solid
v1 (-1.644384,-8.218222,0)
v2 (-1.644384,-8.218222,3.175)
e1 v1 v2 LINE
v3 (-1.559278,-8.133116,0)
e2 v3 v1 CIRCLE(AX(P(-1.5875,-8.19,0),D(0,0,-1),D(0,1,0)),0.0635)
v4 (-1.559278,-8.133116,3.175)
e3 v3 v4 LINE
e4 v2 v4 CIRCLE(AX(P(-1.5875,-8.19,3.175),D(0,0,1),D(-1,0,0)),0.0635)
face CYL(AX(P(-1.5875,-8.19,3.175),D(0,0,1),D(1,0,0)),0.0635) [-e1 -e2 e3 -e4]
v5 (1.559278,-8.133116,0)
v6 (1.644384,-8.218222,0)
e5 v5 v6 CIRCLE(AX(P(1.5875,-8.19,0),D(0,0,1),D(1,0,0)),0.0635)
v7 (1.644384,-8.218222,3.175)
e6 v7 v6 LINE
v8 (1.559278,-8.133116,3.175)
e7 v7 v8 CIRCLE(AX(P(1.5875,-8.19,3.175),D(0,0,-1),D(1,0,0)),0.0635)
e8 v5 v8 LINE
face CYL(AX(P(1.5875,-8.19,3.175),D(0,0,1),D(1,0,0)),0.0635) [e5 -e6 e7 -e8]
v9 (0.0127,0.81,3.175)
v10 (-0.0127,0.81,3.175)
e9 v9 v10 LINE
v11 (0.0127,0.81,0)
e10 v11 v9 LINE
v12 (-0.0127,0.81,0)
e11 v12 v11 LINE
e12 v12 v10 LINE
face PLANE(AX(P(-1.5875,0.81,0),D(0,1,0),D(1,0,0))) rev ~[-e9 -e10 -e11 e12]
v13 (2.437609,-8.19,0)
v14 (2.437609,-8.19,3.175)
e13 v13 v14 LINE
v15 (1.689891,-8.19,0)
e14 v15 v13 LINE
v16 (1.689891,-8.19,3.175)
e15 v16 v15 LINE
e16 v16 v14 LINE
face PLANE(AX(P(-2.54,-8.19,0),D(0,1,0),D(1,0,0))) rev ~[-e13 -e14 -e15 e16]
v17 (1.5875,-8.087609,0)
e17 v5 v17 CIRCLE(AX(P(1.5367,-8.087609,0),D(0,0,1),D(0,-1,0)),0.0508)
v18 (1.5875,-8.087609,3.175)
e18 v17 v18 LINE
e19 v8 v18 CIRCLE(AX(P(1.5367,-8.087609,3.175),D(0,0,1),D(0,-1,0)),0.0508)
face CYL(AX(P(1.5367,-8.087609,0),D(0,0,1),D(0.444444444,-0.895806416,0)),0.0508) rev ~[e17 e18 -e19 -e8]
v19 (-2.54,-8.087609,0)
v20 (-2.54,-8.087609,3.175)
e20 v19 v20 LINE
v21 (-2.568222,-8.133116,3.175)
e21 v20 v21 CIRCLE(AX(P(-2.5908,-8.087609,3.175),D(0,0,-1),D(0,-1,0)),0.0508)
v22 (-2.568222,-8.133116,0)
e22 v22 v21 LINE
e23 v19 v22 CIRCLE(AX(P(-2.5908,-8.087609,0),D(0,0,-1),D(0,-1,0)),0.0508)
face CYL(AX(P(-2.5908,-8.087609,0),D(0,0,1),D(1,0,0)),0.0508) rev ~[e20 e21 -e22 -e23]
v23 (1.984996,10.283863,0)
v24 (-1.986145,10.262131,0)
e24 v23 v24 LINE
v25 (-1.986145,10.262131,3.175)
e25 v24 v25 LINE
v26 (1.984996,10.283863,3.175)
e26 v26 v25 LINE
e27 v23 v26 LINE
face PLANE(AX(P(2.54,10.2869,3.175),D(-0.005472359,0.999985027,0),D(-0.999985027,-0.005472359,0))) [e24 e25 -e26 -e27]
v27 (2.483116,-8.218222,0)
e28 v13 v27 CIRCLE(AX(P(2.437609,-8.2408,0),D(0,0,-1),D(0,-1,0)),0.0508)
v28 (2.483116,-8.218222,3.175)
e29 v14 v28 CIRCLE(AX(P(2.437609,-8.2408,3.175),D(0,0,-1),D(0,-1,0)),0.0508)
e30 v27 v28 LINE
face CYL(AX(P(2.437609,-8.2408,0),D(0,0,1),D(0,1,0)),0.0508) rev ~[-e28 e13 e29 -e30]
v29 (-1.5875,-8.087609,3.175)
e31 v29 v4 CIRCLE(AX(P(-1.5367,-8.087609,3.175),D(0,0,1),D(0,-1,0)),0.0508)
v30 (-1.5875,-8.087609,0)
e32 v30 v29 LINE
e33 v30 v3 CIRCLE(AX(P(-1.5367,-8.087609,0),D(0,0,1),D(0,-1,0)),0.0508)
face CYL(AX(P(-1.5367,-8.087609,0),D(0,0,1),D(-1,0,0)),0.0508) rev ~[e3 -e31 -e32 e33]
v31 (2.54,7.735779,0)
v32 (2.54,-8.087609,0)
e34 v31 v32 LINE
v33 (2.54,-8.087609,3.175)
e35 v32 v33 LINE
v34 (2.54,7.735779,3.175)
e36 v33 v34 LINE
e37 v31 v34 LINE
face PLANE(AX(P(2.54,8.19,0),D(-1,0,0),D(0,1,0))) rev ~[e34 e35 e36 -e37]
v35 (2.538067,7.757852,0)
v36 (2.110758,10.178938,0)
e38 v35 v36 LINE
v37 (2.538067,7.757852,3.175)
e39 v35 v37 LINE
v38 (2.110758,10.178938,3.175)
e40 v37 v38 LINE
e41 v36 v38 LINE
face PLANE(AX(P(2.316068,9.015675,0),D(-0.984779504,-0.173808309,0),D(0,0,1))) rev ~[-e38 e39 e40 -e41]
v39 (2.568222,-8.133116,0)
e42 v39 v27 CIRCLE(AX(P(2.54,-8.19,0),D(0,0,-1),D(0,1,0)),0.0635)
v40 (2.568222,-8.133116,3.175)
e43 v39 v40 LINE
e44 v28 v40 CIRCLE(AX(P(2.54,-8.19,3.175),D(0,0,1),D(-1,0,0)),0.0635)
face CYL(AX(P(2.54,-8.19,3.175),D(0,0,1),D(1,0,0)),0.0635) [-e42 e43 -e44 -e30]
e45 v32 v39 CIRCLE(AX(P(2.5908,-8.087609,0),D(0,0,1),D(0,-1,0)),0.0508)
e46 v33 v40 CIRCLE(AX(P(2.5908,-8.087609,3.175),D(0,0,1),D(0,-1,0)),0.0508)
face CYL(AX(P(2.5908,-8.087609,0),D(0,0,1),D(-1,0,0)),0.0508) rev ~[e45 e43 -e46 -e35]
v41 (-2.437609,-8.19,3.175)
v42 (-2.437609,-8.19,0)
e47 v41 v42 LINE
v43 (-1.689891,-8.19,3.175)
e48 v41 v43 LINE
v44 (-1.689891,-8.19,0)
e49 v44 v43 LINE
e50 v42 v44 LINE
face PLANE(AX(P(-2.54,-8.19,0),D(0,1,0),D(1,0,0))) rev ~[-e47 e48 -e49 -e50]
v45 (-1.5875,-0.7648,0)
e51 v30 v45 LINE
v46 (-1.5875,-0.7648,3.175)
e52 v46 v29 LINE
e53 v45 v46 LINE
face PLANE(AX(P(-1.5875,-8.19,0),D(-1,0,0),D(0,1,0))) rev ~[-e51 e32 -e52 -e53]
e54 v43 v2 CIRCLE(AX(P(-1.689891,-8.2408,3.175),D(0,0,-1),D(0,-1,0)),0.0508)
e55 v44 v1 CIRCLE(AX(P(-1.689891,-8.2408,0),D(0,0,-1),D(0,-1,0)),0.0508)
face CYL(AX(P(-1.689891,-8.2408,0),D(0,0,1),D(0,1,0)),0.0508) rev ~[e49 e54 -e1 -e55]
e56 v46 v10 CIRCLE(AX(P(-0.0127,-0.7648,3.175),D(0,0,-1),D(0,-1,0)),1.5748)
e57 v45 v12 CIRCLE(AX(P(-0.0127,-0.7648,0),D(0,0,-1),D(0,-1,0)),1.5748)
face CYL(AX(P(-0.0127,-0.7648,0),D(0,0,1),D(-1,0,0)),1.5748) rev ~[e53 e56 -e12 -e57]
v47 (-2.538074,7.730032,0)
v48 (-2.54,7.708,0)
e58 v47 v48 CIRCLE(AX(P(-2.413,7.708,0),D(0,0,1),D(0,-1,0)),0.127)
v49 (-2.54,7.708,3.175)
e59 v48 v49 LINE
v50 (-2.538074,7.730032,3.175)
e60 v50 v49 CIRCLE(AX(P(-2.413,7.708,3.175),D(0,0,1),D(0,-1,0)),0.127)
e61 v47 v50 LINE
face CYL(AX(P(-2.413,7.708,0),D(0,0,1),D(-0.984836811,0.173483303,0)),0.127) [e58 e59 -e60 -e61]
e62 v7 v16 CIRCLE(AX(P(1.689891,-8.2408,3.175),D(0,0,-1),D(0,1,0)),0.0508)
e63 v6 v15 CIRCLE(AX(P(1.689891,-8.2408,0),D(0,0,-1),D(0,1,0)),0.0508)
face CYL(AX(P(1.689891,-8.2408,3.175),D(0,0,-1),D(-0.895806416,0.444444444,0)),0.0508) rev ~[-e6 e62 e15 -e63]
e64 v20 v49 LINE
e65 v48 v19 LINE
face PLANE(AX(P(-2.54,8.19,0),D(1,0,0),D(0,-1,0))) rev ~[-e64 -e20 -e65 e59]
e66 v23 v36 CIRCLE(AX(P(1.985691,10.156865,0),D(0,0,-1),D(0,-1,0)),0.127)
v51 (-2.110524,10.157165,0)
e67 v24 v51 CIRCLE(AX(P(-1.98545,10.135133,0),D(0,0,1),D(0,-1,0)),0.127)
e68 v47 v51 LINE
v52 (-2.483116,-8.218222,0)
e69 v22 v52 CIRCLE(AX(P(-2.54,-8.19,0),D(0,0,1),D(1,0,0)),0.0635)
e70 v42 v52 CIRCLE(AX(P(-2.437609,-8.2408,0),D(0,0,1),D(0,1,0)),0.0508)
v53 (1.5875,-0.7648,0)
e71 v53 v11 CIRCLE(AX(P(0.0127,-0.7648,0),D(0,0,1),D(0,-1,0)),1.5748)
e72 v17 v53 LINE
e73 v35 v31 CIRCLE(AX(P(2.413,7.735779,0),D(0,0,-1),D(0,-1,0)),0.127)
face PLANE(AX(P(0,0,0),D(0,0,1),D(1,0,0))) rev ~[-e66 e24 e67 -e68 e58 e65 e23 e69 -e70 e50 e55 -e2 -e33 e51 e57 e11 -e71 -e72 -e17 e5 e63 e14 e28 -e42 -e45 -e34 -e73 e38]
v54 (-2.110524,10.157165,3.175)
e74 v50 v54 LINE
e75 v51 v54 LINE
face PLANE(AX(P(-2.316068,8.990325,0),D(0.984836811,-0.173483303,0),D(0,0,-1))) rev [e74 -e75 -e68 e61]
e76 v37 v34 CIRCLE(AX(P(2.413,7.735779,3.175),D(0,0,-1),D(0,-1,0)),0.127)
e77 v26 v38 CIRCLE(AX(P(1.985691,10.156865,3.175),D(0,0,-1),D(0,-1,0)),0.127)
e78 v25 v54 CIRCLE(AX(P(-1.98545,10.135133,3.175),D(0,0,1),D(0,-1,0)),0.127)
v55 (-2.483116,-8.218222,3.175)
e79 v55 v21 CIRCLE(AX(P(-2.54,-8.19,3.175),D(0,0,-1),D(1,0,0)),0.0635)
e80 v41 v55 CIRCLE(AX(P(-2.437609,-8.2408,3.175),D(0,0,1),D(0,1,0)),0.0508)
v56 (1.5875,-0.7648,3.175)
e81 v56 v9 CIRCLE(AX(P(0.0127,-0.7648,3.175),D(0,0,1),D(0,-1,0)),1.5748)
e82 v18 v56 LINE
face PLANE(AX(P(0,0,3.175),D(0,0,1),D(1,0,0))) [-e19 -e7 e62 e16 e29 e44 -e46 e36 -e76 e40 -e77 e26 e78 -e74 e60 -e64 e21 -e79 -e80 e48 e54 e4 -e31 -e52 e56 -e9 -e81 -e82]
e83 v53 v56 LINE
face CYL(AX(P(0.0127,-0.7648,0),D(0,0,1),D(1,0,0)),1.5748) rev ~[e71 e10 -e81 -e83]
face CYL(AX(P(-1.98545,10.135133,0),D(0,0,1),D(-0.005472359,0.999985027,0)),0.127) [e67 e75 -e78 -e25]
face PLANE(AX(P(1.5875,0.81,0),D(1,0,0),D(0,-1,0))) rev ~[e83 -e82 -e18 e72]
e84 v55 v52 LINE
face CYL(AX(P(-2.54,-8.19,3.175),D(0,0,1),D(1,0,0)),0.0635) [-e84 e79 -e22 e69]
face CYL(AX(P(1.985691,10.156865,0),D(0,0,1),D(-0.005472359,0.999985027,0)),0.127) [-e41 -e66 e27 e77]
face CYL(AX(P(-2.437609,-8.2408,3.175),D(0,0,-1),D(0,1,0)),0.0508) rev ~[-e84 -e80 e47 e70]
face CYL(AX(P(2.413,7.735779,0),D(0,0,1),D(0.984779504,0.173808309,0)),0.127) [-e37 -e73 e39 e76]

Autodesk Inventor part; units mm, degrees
ref_plane "YZ Plane" through (0, 0, 0) normal (1, 0, 0) x (0, 1, 0)
ref_plane "XZ Plane" through (0, 0, 0) normal (0, 1, 0) x (-1, 0, 0)
ref_plane "XY Plane" through (0, 0, 0) normal (0, 0, 1) x (1, 0, 0)
sketch "Sketch1" plane through (0, 0, 0) normal (0, 0, 1) x (1, 0, 0)
  line L0 (-2.54, -8.19) -> (2.54, -8.19)
  line L1 (2.54, -8.19) -> (2.54, 8.19)
  line L2 (-2.54, 8.19) -> (-2.54, -8.19)
  line L3 (-2.54, -8.19) -> (2.54, 8.19) construction
  line L4 (2.54, -8.19) -> (-2.54, 8.19) construction
  circle A0 centre (0, 16.6545) radius 2.5 construction
  circle A1 centre (0, 16.6545) radius 5
  arc A2 (6.8029, 15.0051) -> (-6.8044, 15.0114) centre (0, 16.6545) ccw
  line L5 (-2.54, 8.19) -> (-2.54, 10.2591)
  line L6 (2.54, 8.19) -> (2.54, 10.2869)
  line L7 (0, 0) -> (0, 10.7842) construction
  line L8 (-2.54, 10.2591) -> (-3.9944, 10.2511)
  line L9 (2.54, 10.2869) -> (3.9944, 10.2948)
  line L10 (-3.9944, 10.2511) -> (-4.1214, 3.9003)
  line L11 (3.9944, 10.2948) -> (4.1214, 3.9454)
  line L12 (-4.1214, 3.9003) -> (-6.8044, 15.0114)
  line L13 (4.1214, 3.9454) -> (6.8029, 15.0051)
  line L14 (0, 0) -> (0, 22.9511) construction
  point P0 (-3.2672, 10.2551)
  dimension "d2" = 5
  dimension "d3" = 10
  dimension "d4" = 14
  dimension "d8" = 1.5815
  dimension "d9" = 1.5815
  dimension "d10" = 6.35
  dimension "d11" = 6.35
  dimension "d18" = 1.4545
  dimension "d19" = 1.4545
  dimension "d31" = 2.54
  dimension "d32" = 2.54
  dimension "d33" = 0
extrude "Plate1" add sketch "Sketch1" along normal blind 3.175
sketch "Sketch2" plane through (0, 0, 0) normal (0, 0, -1) x (-1, 0, 0)
  circle A0 centre (0, 16.6545) radius 5 projected
  line L0 (-3.9944, 10.2948) -> (-4.1214, 3.9454) projected
  line L1 (-2.54, 10.2869) -> (-3.9944, 10.2948) projected
  line L2 (-2.54, -8.19) -> (-2.54, 10.2869) projected
  line L3 (2.54, -8.19) -> (-2.54, -8.19) projected
  line L4 (2.54, 10.2591) -> (2.54, -8.19) projected
  line L5 (3.9944, 10.2511) -> (2.54, 10.2591) projected
  line L6 (4.1214, 3.9003) -> (3.9944, 10.2511) projected
  line L7 (6.8044, 15.0114) -> (4.1214, 3.9003) projected
  arc A1 (6.8044, 15.0114) -> (-6.8029, 15.0051) centre (0, 16.6545) ccw projected
  line L8 (-4.1214, 3.9454) -> (-6.8029, 15.0051) projected
  line L9 (-1.5875, -17.19) -> (1.5875, -17.19)
  line L10 (1.5875, -17.19) -> (1.5875, 0.81)
  line L11 (1.5875, 0.81) -> (-1.5875, 0.81)
  line L12 (-1.5875, 0.81) -> (-1.5875, -17.19)
  line L13 (-1.5875, -17.19) -> (1.5875, 0.81) construction
  line L14 (1.5875, -17.19) -> (-1.5875, 0.81) construction
  point P0 (0, 0)
  point P1 (0, -8.19)
  dimension "d14" = 3.175
extrude "Extrusion1" cut sketch "Sketch2" against normal blind 25.4 contours L12 L11 L10 L3 | L3 L10 L9 L12
sketch "Sketch3" plane through (0, 0, 3.175) normal (0, 0, 1) x (1, 0, 0)
  circle A0 centre (-37.757, 0) radius 3
  line L0 (-39.3445, -2.5456) -> (-36.1695, -2.5456)
  line L1 (-36.1695, -2.5456) -> (-36.1695, 2.5456)
  line L2 (-36.1695, 2.5456) -> (-39.3445, 2.5456)
  line L3 (-39.3445, 2.5456) -> (-39.3445, -2.5456)
  line L4 (-39.3445, -2.5456) -> (-36.1695, 2.5456) construction
  line L5 (-36.1695, -2.5456) -> (-39.3445, 2.5456) construction
  circle A1 centre (-37.757, 0) radius 4
  point P0 (0, 0)
  point P1 (-37.757, 3)
  point P2 (-37.757, 4)
  dimension "d35" = 8
  dimension "d28" = 6
  dimension "d29" = 3.175
  dimension "d30" = 5.0911
  dimension "d34" = 0.4545
  dimension "d36" = 1.4545
sketch "Sketch4" plane through (0, 0, 3.175) normal (0, 0, 1) x (1, 0, 0)
  line L0 (-1.5875, -8.19) -> (-1.5875, 0.81) projected
  line L1 (-1.5875, 0.81) -> (1.5875, 0.81) projected
  line L2 (1.5875, 0.81) -> (1.5875, -8.19) projected
  line L3 (2.54, -8.19) -> (1.5875, -8.19) projected
  line L4 (2.54, 10.2869) -> (2.54, -8.19) projected
  line L5 (3.9944, 10.2948) -> (2.54, 10.2869) projected
  line L6 (4.1214, 3.9454) -> (3.9944, 10.2948) projected
  line L7 (6.8029, 15.0051) -> (4.1214, 3.9454) projected
  arc A0 (6.8029, 15.0051) -> (-6.8044, 15.0114) centre (0, 16.6545) ccw projected
  line L8 (-4.1214, 3.9003) -> (-6.8044, 15.0114) projected
  line L9 (-3.9944, 10.2511) -> (-4.1214, 3.9003) projected
  line L10 (-2.54, 10.2591) -> (-3.9944, 10.2511) projected
  line L11 (-2.54, -8.19) -> (-2.54, 10.2591) projected
  line L12 (-1.5875, -8.19) -> (-2.54, -8.19) projected
  circle A1 centre (0, 16.6545) radius 5 projected
  line L13 (-2.54, 10.2591) -> (-3.7175, 2.2274)
  line L14 (-3.7175, 2.2274) -> (-9.3024, 3.6769)
  line L15 (-9.3024, 3.6769) -> (-11.1796, 30.918)
  line L16 (-11.1796, 30.918) -> (24.5864, 22.2464)
  line L17 (24.5864, 22.2464) -> (4.4395, 2.4617)
  line L18 (4.4395, 2.4617) -> (3.4851, 4.2508)
  line L19 (3.4851, 4.2508) -> (2.54, 10.2869)
  line L20 (2.54, 10.2869) -> (-2.54, 10.2591)
  point P0 (0, 0)
extrude "Extrusion2" cut sketch "Sketch4" against normal blind 25.4 contours L13 L14 L15 L16 L17 L18 L19 L5 L6 L7 A0 L8 L9 L10 | L10 L9 L8 A0 L7 L6 L5 L20 | A1
chamfer "Chamfer3" distance 2.54 angle 10 1 edges at (2.54, 10.2869, 1.5875) measured on face at (2.54, -2.0311, 1.0583)
chamfer "Chamfer4" distance 2.54 angle 10 1 edges at (-2.54, 10.2591, 1.5875) measured on face at (-2.54, -2.0403, 1.0583)
fillet "Fillet5" radius 0.127 4 edges at (-2.0921, 10.2615, 1.5875) (-2.54, 7.7191, 1.5875) (2.0921, 10.2844, 1.5875) (2.54, 7.7469, 1.5875)
fillet "Fillet6" radius 1.5748 2 edges at (-1.5875, 0.81, 1.5875) (1.5875, 0.81, 1.5875)
sketch "Sketch5" plane through (0, 0, 3.175) normal (0, 0, 1) x (1, 0, 0)
  arc A0 (2.54, 7.7358) -> (2.5381, 7.7578) centre (2.413, 7.7358) ccw projected
  line L0 (2.1112, 10.1789) -> (2.5381, 7.7578) projected
  arc A1 (2.1112, 10.1789) -> (1.9854, 10.2839) centre (1.9861, 10.1569) ccw projected
  line L1 (1.9854, 10.2839) -> (-1.9857, 10.2621) projected
  arc A2 (-1.9857, 10.2621) -> (-2.1101, 10.1572) centre (-1.985, 10.1351) ccw projected
  line L2 (-2.5381, 7.73) -> (-2.1101, 10.1572) projected
  arc A3 (-2.5381, 7.73) -> (-2.54, 7.708) centre (-2.413, 7.708) ccw projected
  line L3 (-2.54, -8.19) -> (-2.54, 7.708) projected
  line L4 (-1.5875, -8.19) -> (-2.54, -8.19) projected
  line L5 (-1.5875, -8.19) -> (-1.5875, -0.7648) projected
  arc A4 (-0.0127, 0.81) -> (-1.5875, -0.7648) centre (-0.0127, -0.7648) ccw projected
  line L6 (-0.0127, 0.81) -> (0.0127, 0.81) projected
  arc A5 (1.5875, -0.7648) -> (0.0127, 0.81) centre (0.0127, -0.7648) ccw projected
  line L7 (1.5875, -0.7648) -> (1.5875, -8.19) projected
  line L8 (2.54, -8.19) -> (1.5875, -8.19) projected
  line L9 (2.54, 7.7358) -> (2.54, -8.19) projected
  circle A6 centre (-2.54, -8.19) radius 0.0635
  circle A7 centre (-1.5875, -8.19) radius 0.0635
  circle A8 centre (1.5875, -8.19) radius 0.0635
  circle A9 centre (2.54, -8.19) radius 0.0635
  point P0 (0, 0)
  dimension "d48" = 0.127
  dimension "d49" = 0.127
  dimension "d50" = 0.127
  dimension "d51" = 0.127
extrude "Extrusion3" add sketch "Sketch5" against normal up to surface (3.175 mm away) contours A9 L8 L9 | L9 L8 A9 | A8 L7 L8 | L8 L7 A8 | A6 L4 L3 | L3 L4 A6 | A7 L4 L5 | L5 L4 A7
fillet "Fillet7" radius 0.0508 8 edges at (-1.651, -8.19, 1.5875) (-2.4765, -8.19, 1.5875) (-2.54, -8.1265, 1.5875) (-1.5875, -8.1265, 1.5875) (2.54, -8.1265, 1.5875) (1.651, -8.19, 1.5875) (1.5875, -8.1265, 1.5875) (2.4765, -8.19, 1.5875)
equation "\"d18\" = d36"
equation "\"d19\" = d36"
equation "\"d49\" = d48"
equation "\"d50\" = d48"
equation "\"d51\" = d48"
equation "\"BendRadius\" = Thickness"
equation "\"BendReliefWidth\" = Thickness"
equation "\"BendReliefDepth\" = 0.5 * Thickness"
equation "\"CornerReliefSize\" = 4 * Thickness"
equation "\"MinimumRemnant\" = 2 * Thickness"
equation "\"TransitionRadius\" = BendRadius"
equation "\"JacobiRadiusSize\" = BendRadius"
equation "\"GapSize\" = Thickness"
equation "\"d12\" = BendRadius"
equation "\"Thickness\" = 3.175"
properties part number "8mm OD 6mm ID Rod Cross125"
